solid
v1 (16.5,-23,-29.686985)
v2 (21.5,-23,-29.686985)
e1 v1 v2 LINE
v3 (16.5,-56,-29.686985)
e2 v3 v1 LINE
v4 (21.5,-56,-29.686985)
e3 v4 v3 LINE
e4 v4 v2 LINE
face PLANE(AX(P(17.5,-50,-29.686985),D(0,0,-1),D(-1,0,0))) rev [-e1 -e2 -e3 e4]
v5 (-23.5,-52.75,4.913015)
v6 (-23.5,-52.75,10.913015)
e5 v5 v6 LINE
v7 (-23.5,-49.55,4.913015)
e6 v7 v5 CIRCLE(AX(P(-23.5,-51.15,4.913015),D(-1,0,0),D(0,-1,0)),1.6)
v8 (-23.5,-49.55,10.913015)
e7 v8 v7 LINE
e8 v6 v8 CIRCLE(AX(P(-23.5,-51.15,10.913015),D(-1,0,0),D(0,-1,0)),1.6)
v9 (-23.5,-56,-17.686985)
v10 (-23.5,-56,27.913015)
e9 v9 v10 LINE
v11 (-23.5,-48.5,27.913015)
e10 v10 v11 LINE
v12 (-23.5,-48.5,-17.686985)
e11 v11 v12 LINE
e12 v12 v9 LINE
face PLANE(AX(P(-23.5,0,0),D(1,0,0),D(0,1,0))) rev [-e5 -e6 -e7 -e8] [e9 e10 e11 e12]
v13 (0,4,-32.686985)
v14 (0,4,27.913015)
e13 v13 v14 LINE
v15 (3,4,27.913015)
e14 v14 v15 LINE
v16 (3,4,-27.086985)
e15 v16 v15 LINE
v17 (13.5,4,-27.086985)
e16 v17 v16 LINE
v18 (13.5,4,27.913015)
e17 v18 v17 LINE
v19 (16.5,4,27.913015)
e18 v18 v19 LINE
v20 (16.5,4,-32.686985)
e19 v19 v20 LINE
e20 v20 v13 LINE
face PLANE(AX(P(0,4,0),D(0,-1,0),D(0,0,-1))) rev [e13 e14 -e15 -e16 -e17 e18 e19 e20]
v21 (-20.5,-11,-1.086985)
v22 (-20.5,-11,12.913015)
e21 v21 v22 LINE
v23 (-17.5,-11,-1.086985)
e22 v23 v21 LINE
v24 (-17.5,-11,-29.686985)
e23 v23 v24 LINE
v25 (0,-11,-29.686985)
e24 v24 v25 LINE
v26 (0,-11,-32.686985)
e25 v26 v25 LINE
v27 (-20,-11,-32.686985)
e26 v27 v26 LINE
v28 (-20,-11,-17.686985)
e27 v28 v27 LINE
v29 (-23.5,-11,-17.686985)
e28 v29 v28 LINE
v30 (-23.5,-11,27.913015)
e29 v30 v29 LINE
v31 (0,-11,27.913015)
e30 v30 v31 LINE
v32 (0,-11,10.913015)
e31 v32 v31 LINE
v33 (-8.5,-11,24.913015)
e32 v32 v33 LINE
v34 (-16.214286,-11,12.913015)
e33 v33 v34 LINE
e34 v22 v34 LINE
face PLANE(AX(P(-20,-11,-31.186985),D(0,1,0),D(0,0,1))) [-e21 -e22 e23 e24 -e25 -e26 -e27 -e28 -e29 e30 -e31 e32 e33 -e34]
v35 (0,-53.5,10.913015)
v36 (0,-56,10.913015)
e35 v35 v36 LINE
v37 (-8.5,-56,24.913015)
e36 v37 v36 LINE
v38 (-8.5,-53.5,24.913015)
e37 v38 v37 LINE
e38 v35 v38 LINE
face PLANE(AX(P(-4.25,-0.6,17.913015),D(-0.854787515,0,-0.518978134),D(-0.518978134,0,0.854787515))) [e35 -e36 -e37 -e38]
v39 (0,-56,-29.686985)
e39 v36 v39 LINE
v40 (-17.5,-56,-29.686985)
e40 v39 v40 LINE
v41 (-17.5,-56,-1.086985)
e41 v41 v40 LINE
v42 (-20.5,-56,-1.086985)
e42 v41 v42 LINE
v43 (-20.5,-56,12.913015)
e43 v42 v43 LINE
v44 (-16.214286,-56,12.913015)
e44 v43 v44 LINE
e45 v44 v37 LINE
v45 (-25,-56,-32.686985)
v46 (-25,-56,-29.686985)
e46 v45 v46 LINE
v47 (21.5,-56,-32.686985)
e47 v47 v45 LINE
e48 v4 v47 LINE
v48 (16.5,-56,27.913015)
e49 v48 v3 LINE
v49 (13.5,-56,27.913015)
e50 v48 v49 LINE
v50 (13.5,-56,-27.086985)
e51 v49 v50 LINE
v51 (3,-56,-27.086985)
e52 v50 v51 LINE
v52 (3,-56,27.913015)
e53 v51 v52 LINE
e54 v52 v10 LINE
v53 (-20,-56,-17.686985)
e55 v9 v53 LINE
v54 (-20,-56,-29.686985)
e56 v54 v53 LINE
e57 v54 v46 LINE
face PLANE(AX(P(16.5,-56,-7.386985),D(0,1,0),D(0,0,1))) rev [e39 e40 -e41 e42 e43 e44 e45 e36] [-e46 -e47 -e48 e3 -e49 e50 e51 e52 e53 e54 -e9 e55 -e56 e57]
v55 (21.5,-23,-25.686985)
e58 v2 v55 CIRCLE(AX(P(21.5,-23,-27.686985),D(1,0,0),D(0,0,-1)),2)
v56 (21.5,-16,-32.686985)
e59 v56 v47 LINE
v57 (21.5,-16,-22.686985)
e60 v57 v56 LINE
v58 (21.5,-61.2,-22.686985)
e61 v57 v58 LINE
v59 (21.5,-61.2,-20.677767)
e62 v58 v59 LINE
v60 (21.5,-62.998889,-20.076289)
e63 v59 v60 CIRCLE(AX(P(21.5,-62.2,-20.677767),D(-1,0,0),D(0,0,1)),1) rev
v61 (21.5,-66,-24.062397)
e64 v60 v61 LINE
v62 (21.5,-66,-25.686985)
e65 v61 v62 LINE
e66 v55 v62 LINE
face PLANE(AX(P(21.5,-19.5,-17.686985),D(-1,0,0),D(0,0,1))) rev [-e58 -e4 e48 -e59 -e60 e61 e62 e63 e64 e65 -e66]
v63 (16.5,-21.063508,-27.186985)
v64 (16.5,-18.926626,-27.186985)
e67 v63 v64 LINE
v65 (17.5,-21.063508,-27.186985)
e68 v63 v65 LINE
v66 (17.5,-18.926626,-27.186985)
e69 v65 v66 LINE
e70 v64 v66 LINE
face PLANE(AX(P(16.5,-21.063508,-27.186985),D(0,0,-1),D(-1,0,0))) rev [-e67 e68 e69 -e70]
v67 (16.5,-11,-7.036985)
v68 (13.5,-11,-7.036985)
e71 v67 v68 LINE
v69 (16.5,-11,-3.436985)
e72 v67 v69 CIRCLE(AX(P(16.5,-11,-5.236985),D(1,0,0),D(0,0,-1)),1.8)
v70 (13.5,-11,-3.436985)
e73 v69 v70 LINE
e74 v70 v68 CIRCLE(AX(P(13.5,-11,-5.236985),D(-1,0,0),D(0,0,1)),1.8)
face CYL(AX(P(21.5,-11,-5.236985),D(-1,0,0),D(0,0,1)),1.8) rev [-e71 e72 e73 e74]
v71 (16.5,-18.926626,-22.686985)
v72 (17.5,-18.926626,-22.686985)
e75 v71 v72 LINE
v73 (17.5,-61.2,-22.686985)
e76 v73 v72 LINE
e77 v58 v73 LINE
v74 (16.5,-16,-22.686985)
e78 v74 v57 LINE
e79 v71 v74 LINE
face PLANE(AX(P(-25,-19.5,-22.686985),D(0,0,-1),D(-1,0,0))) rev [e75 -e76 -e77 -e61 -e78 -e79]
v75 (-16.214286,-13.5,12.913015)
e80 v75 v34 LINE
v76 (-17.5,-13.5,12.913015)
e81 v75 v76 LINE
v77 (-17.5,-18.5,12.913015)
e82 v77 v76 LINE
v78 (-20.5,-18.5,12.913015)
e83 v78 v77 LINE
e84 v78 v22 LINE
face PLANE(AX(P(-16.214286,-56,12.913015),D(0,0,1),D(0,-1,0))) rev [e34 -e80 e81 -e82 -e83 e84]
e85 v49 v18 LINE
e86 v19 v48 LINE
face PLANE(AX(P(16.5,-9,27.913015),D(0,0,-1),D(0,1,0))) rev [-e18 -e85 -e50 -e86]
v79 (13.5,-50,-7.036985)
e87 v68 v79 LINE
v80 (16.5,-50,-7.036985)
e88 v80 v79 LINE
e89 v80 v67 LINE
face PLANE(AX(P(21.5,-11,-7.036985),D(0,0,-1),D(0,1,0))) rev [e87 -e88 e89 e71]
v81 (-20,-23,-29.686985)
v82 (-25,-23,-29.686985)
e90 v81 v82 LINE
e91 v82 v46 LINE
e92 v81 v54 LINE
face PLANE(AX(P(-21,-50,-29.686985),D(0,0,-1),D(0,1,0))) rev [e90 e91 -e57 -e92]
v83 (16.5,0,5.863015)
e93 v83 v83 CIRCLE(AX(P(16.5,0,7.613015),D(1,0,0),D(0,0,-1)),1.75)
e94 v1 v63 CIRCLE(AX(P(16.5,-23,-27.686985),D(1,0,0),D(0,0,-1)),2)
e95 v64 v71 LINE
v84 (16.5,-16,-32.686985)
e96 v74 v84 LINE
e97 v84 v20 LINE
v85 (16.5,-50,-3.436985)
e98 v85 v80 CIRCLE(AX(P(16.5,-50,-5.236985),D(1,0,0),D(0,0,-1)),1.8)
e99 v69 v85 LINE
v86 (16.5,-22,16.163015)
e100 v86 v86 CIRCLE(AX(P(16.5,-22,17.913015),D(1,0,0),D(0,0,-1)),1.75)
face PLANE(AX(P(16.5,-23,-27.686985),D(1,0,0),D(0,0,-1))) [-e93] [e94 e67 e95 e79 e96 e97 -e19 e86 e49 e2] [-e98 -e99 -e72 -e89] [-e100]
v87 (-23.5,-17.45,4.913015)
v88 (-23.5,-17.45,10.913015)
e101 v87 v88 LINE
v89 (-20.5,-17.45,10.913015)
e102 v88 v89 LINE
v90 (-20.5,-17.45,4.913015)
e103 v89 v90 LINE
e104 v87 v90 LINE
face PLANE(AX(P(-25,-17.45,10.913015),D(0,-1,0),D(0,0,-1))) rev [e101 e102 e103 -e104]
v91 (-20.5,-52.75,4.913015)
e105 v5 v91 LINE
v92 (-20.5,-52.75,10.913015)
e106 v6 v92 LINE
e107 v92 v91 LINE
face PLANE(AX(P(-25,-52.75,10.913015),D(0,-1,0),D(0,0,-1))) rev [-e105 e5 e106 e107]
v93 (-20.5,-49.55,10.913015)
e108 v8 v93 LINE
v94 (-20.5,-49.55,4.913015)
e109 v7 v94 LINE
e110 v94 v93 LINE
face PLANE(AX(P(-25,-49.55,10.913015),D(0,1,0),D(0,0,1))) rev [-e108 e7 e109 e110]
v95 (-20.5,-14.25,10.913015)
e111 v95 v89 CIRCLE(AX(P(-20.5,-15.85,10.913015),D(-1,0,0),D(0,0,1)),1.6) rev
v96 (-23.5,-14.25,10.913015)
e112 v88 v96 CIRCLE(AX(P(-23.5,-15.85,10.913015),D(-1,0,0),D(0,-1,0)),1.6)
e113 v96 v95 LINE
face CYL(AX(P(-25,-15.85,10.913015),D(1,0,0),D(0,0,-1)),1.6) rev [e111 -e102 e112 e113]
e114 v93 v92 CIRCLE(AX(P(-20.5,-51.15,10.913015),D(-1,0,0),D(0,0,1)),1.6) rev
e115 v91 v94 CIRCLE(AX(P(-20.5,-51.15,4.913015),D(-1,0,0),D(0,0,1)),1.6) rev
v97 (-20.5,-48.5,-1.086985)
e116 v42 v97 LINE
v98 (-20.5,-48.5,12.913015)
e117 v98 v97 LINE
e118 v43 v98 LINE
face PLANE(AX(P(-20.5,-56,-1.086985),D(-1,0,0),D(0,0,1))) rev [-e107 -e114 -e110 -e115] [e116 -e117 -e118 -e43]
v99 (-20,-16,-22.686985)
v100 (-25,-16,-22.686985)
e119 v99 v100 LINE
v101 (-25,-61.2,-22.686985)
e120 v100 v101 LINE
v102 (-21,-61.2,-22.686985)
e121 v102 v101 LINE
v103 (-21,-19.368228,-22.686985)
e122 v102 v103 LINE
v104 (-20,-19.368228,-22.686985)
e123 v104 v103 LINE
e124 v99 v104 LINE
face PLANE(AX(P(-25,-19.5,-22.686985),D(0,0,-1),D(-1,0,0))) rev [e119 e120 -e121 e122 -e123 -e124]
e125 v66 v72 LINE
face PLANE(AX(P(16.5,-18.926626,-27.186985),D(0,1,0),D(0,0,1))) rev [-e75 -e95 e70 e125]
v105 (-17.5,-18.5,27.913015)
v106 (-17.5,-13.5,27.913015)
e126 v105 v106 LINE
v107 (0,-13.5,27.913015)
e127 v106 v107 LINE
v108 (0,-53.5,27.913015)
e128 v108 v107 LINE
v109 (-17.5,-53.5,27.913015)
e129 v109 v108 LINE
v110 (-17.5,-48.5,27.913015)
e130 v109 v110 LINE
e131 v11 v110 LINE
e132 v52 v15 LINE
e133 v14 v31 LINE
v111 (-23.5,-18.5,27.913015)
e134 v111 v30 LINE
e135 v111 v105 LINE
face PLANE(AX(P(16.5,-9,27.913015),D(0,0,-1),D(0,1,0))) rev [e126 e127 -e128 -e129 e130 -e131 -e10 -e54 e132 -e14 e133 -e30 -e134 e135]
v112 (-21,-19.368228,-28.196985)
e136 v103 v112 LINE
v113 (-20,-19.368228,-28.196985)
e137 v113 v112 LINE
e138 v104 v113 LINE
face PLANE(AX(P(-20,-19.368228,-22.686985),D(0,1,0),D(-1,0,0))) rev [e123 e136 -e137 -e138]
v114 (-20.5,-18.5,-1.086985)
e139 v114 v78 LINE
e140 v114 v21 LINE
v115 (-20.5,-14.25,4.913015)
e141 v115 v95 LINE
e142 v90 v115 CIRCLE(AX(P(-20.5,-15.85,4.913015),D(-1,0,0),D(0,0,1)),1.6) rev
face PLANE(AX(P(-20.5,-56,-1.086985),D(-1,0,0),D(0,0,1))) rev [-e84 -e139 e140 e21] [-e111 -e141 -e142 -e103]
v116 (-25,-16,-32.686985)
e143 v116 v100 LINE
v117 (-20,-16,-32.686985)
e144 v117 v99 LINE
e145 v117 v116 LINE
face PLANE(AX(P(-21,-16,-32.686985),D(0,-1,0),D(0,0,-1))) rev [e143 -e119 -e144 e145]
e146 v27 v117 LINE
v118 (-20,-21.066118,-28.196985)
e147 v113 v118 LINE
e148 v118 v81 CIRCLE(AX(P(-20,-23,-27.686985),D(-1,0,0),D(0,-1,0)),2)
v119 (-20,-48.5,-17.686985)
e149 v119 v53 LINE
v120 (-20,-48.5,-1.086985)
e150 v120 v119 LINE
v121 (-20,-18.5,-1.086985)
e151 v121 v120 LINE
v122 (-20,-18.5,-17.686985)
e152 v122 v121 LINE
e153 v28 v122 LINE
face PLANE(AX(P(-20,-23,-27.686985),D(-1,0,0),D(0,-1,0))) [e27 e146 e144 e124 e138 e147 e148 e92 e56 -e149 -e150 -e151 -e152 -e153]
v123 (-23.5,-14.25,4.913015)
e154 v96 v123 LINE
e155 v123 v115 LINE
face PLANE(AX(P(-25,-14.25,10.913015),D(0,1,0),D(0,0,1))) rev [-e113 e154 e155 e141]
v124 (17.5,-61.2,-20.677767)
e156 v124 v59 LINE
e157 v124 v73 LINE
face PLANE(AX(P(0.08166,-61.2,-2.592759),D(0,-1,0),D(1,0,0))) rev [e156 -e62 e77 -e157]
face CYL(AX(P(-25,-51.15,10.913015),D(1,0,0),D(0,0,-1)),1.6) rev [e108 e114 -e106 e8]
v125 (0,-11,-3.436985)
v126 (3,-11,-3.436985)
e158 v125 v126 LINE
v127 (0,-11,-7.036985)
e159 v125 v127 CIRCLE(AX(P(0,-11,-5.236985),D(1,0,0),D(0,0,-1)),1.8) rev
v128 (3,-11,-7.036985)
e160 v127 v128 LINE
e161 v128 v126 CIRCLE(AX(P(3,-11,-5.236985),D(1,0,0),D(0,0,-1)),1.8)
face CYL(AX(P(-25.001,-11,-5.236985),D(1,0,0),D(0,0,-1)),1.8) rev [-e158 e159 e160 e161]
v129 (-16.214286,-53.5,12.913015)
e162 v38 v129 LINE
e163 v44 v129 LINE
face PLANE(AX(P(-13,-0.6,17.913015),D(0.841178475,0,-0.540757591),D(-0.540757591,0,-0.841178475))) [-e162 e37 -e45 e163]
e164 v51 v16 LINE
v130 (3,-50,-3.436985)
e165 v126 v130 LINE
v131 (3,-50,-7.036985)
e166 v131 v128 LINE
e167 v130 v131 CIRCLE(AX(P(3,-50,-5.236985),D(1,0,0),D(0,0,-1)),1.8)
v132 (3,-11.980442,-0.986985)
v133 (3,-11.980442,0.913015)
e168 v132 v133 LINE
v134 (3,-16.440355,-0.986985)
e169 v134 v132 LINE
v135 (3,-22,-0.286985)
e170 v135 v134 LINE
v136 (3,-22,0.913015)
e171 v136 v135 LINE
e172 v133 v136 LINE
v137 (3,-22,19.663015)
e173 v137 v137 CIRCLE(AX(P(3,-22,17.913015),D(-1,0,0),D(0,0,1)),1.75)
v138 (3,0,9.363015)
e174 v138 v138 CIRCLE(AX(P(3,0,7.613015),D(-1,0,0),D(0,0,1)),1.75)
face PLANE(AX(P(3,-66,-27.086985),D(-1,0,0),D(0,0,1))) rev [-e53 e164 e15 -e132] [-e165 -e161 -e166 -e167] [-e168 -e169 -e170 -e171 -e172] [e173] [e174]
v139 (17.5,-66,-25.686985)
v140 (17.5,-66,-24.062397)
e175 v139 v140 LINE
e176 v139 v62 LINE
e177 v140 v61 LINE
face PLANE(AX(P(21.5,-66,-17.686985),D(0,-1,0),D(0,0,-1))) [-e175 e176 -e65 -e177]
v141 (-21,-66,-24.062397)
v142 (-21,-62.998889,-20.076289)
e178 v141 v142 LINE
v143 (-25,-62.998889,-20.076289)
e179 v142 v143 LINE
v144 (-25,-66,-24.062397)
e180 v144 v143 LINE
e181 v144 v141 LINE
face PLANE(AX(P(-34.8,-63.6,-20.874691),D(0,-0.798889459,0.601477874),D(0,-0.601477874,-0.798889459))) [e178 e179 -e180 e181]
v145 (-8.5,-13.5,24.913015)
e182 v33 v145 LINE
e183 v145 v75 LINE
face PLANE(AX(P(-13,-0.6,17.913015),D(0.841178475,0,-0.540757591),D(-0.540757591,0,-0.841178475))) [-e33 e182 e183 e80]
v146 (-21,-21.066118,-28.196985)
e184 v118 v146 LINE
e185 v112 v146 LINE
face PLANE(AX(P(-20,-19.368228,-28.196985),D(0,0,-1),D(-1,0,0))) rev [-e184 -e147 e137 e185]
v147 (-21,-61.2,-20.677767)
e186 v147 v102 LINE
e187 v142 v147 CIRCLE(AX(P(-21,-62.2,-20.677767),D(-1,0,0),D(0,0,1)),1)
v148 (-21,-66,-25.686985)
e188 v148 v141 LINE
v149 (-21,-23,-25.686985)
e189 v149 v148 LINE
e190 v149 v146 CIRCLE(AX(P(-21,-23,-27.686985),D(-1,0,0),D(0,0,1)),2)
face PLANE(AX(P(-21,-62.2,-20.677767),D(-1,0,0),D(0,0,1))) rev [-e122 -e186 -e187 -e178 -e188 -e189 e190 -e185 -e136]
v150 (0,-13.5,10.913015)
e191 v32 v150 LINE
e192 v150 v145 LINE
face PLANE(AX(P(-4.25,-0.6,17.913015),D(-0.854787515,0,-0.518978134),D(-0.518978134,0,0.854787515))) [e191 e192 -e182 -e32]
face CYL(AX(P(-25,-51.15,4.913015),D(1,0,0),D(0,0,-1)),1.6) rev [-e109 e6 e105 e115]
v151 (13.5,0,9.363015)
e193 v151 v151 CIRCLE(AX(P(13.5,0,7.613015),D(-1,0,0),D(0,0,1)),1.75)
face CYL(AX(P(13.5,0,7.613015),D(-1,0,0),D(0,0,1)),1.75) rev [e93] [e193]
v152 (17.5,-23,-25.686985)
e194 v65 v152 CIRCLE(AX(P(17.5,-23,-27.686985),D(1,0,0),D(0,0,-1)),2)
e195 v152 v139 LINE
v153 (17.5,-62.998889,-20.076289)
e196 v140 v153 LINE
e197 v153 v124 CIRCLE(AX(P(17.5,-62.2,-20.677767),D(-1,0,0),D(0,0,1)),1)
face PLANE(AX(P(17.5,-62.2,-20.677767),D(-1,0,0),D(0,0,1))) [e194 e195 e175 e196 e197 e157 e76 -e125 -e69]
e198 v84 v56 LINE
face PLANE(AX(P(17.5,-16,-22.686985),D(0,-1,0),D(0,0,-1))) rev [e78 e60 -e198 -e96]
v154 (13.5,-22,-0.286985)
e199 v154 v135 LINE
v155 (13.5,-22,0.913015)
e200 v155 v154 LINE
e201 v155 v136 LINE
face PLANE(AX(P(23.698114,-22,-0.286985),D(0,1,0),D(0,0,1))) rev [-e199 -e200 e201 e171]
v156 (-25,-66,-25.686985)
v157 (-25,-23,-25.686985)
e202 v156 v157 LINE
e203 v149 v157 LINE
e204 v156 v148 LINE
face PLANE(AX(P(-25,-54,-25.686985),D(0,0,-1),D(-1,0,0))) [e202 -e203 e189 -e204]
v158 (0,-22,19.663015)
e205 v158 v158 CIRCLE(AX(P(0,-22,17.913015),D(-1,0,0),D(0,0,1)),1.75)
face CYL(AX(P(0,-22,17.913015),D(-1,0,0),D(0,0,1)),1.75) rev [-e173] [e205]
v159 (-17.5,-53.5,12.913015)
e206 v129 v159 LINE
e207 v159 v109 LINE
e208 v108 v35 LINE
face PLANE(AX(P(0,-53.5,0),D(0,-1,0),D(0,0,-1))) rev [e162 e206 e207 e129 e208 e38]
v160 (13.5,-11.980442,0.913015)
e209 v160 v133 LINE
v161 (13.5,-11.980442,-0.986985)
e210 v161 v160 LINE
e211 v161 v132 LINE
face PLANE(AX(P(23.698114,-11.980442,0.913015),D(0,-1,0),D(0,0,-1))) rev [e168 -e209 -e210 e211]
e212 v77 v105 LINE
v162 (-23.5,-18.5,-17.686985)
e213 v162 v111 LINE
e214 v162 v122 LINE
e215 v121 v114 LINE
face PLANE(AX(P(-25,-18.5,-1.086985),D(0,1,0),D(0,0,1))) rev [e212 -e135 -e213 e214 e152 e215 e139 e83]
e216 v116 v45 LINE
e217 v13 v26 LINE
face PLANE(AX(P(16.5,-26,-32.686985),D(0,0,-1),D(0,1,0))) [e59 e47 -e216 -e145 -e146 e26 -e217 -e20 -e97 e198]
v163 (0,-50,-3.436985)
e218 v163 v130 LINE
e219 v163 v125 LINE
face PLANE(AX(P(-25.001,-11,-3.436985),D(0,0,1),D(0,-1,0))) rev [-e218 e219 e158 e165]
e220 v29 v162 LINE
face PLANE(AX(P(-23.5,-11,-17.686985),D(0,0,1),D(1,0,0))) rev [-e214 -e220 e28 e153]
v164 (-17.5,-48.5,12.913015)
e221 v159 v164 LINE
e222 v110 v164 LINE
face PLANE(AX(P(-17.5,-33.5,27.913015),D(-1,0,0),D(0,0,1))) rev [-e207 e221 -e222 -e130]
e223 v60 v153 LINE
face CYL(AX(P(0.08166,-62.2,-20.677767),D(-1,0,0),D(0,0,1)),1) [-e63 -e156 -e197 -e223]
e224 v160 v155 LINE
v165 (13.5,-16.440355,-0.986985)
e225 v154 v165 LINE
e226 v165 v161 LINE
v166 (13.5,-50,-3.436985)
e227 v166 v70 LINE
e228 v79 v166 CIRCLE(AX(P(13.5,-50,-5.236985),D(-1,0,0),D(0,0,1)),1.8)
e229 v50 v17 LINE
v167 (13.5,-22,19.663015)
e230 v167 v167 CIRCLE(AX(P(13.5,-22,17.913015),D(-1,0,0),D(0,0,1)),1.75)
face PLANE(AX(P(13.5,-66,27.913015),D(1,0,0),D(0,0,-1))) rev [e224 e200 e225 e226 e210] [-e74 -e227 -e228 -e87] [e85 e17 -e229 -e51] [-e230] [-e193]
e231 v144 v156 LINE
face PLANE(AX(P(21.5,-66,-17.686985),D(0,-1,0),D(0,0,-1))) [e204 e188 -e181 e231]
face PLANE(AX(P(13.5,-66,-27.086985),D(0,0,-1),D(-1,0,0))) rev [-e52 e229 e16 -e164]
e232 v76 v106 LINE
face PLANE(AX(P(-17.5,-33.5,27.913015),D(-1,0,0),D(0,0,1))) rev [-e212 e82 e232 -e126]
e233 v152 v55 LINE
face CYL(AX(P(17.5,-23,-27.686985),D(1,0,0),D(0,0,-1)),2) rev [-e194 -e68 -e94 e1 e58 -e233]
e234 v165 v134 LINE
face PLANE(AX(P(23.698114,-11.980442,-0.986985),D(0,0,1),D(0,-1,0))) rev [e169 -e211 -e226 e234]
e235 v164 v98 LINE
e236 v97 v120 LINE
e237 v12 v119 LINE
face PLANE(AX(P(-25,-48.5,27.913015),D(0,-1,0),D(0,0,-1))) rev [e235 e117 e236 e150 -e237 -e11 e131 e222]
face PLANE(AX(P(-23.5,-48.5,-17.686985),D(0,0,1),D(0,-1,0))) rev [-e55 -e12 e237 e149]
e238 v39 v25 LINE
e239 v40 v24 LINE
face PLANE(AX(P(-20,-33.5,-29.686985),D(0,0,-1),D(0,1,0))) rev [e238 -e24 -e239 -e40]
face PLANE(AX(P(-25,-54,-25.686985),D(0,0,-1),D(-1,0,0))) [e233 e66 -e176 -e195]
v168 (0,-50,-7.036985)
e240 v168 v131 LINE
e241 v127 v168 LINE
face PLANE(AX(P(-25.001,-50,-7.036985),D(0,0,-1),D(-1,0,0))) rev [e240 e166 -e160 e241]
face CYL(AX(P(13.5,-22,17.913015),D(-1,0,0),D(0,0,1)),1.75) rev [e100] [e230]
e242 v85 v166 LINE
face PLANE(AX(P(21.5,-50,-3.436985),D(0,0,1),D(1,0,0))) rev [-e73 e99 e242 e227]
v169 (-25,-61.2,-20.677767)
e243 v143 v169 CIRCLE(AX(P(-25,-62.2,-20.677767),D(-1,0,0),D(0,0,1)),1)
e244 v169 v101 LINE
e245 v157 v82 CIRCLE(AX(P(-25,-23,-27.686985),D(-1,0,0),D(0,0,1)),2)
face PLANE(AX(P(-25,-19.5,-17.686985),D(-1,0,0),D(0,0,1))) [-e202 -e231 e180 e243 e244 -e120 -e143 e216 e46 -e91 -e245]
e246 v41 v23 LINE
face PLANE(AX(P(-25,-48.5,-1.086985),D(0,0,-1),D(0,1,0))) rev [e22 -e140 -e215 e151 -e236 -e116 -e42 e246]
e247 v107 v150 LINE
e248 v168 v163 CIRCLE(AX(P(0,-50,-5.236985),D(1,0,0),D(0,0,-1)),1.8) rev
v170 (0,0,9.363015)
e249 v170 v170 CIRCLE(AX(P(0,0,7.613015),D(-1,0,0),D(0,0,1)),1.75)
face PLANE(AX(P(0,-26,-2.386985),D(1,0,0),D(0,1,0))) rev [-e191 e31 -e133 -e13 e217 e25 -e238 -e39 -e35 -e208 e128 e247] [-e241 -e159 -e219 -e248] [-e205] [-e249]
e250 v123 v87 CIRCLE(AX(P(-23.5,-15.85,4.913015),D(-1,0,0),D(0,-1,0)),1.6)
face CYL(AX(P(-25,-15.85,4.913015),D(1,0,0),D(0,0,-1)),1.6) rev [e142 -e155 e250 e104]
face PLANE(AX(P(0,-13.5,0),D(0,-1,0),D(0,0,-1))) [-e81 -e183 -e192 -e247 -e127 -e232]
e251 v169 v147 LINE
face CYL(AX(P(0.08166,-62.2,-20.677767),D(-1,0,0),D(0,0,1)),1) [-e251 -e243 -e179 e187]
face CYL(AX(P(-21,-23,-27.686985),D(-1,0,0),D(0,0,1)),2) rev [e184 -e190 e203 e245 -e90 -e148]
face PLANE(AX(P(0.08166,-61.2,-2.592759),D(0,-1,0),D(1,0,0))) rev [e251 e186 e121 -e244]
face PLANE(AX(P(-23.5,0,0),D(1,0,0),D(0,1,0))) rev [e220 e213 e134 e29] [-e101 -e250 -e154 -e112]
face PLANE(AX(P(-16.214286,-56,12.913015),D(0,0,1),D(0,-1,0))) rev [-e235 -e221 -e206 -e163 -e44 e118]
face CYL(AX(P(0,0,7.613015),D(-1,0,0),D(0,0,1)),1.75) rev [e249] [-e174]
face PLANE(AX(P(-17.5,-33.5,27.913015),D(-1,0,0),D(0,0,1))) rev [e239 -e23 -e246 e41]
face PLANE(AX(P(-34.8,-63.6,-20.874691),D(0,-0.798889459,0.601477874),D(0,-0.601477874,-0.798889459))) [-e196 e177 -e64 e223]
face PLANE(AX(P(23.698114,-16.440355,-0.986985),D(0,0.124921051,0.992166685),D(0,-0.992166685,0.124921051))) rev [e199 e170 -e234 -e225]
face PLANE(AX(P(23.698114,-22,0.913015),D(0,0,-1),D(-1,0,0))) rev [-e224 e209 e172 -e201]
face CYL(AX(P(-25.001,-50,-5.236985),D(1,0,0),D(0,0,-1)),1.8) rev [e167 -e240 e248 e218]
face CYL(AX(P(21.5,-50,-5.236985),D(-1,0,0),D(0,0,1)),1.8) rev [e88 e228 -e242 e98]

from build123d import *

# Parameters (mm, degrees)
CUT_EXTRUDE1_START             = -55
CUT_EXTRUDE1_DEPTH             = 50.2
CUT_EXTRUDE1_2_DEPTH           = 39
CUT_EXTRUDE1_START_2           = -16
CUT_EXTRUDE1_3_OUTLINE_W       = 21.5
CUT_EXTRUDE1_3_OUTLINE_H       = 4
CUT_EXTRUDE1_3_OUTLINE_W_2     = 7.5
CUT_EXTRUDE1_3_DEPTH           = 6
CUT_EXTRUDE1_START_3           = -10
CUT_EXTRUDE1_4_OUTLINE_W       = 17.5
CUT_EXTRUDE1_4_OUTLINE_H       = 3
CUT_EXTRUDE1_4_DEPTH           = 6.998889459
CUT_EXTRUDE1_START_4           = -32.686984715
CUT_EXTRUDE1_5_DEPTH           = 2.5
CUT_EXTRUDE1_START_5           = -25
CUT_EXTRUDE1_6_DEPTH           = 46.5
CUT_EXTRUDE2_DEPTH             = 5.2
CUT_EXTRUDE3_DEPTH             = 40
CUT_EXTRUDE4_DEPTH             = 38.5
CUT_EXTRUDE5_DEPTH             = 4
CUT_EXTRUDE6_DEPTH             = 4
CUT_EXTRUDE7_DEPTH             = 4
CUT_EXTRUDE8_START             = -4
CUT_EXTRUDE8_DEPTH             = 4
CUT_EXTRUDE9_START             = -1
CUT_EXTRUDE9_DEPTH             = 1
CUT_EXTRUDE10_DEPTH            = 1
SKETCH11_W                     = 16.5
SKETCH11_H                     = 60.6
BOSS_EXTRUDE1_DEPTH            = 15
SKETCH12_W                     = 29
SKETCH12_H                     = 30
CUT_EXTRUDE11_DEPTH            = 84.339300358
SKETCH13_W                     = 10.5
SKETCH13_H                     = 55
CUT_EXTRUDE12_DEPTH            = 82.199993727
CUT_EXTRUDE15_DEPTH            = 84.106491828
CUT_EXTRUDE16_REACH            = 80.794
BOSS_EXTRUDE2_DEPTH            = 10.5
F_3_5_3_5_DIAMETER_HOLE1_D     = 3.5
F_3_5_3_5_DIAMETER_HOLE1_DEPTH = 3
F_3_5_3_5_DIAMETER_HOLE2_D     = 3.5
F_3_5_3_5_DIAMETER_HOLE2_DEPTH = 8
SKETCH24_W                     = 46.5
SKETCH24_H                     = 16
CUT_EXTRUDE17_DEPTH            = 3
SKETCH25_W                     = 3
SKETCH25_H                     = 6
BOSS_EXTRUDE4_DEPTH            = 46.5
SKETCH27_W                     = 45.6
SKETCH27_H                     = 7.5
BOSS_EXTRUDE5_DEPTH            = 3.5
CUT_EXTRUDE18_START            = -45
SKETCH28_W                     = 4.285714286
SKETCH28_H                     = 14
CUT_EXTRUDE18_DEPTH            = 45


with BuildPart() as part:
    # Cut-Extrude1: read off the stored shape, not the designer's step
    # Cut-Extrude1 outline → Cut-Extrude1 (new body)
    with BuildSketch(Plane.XZ.offset(66).offset(CUT_EXTRUDE1_START)):
        Polygon((0, 10.913015285), (0, -25.686984715), (21.5, -25.686984715), (21.5, 27.913015285), (-25, 27.913015285), (-25, -25.686984715), (-17.5, -25.686984715), (-17.5, 10.913015285), (-8.5, 24.913015285), align=None)
    extrude(amount=CUT_EXTRUDE1_DEPTH)

    # Cut-Extrude1 2 outline → Cut-Extrude1 2 (add)
    with BuildSketch(Plane.XZ.offset(66).offset(CUT_EXTRUDE1_START)):
        Polygon((21.5, -25.686984715), (0, -25.686984715), (0, -29.686984715), (-17.5, -29.686984715), (-17.5, -25.686984715), (-25, -25.686984715), (-25, -32.686984715), (21.5, -32.686984715), align=None)
    extrude(amount=CUT_EXTRUDE1_2_DEPTH)

    # Cut-Extrude1 3 outline → Cut-Extrude1 3 (add)
    with BuildSketch(Plane.XZ.offset(66).offset(CUT_EXTRUDE1_START_2)):
        with Locations((10.75, -27.686984715)):
            Rectangle(CUT_EXTRUDE1_3_OUTLINE_W, CUT_EXTRUDE1_3_OUTLINE_H)
        with Locations((-21.25, -27.686984715)):
            Rectangle(CUT_EXTRUDE1_3_OUTLINE_W_2, CUT_EXTRUDE1_3_OUTLINE_H)
    extrude(amount=CUT_EXTRUDE1_3_DEPTH)

    # Cut-Extrude1 4 outline → Cut-Extrude1 4 (add)
    with BuildSketch(Plane.XZ.offset(66).offset(CUT_EXTRUDE1_START_3)):
        with Locations((-8.75, -24.186984715)):
            Rectangle(CUT_EXTRUDE1_4_OUTLINE_W, CUT_EXTRUDE1_4_OUTLINE_H)
    extrude(amount=CUT_EXTRUDE1_4_DEPTH)

    # Cut-Extrude1 5 outline → Cut-Extrude1 5 (add)
    with BuildSketch(Plane.XY.offset(CUT_EXTRUDE1_START_4)):
        with BuildLine():
            Line((21.5, -50), (20, -50))
            add(Edge.make_bspline(
                [(20, -50), (20, -56.474665919), (-1.75, -56.474665919), (-23.5, -56.474665919), (-23.5, -50)],
                knots=[3.141592654, 3.141592654, 3.141592654, 4.71238898, 4.71238898, 6.283185307, 6.283185307, 6.283185307], degree=2, weights=[1, 0.707106781, 1, 0.707106781, 1]))
            Line((-23.5, -50), (-25, -50))
            add(Edge.make_bspline(
                [(21.5, -50), (21.5, -50.09468229), (21.492127929, -50.284046871), (21.445455232, -50.658803427), (21.331279759, -51.114385581), (21.116585857, -51.62790352), (20.837225059, -52.104092778), (20.503510106, -52.544605667), (19.994946462, -53.090128019), (19.250040532, -53.706208194), (18.455849001, -54.204954404), (17.874413136, -54.519485832), (17.472964493, -54.724490985), (16.947888344, -54.97109157), (16.28060453, -55.252861877), (15.342350204, -55.610435464), (14.08020873, -56.024524848), (12.704647903, -56.395626222), (11.540151261, -56.666305963), (10.635775953, -56.85602278), (9.857415835, -57.002816928), (9.220023976, -57.113406891), (8.575249929, -57.219018373), (7.756242667, -57.341650868), (6.420129281, -57.517794074), (4.706083352, -57.700164474), (2.944949539, -57.831502083), (1.514762167, -57.90548411), (0.433251397, -57.945296373), (-0.473981522, -57.965298566), (-1.2023611, -57.973324155), (-1.75, -57.975336801), (-2.2976389, -57.973324155), (-3.026018478, -57.965298566), (-3.933251397, -57.945296373), (-5.014762167, -57.90548411), (-6.444949539, -57.831502083), (-8.206083352, -57.700164474), (-9.920129281, -57.517794074), (-11.256242667, -57.341650868), (-12.075249929, -57.219018373), (-12.720023976, -57.113406891), (-13.357415835, -57.002816928), (-14.135775953, -56.85602278), (-15.040151261, -56.666305963), (-16.204647903, -56.395626222), (-17.58020873, -56.024524848), (-18.842350204, -55.610435464), (-19.78060453, -55.252861877), (-20.447888344, -54.97109157), (-20.972964493, -54.724490985), (-21.374413136, -54.519485832), (-21.955849001, -54.204954404), (-22.750040532, -53.706208194), (-23.494946462, -53.090128019), (-24.003510106, -52.544605667), (-24.337225059, -52.104092778), (-24.616585857, -51.62790352), (-24.831279759, -51.114385581), (-24.945455232, -50.658803427), (-24.992127929, -50.284046871), (-25, -50.09468229), (-25, -50)],
                knots=[0.5, 0.5, 0.5, 0.5, 0.50390625, 0.5078125, 0.515625, 0.5234375, 0.53125, 0.5390625, 0.546875, 0.5625, 0.578125, 0.58203125, 0.5859375, 0.59375, 0.6015625, 0.609375, 0.625, 0.640625, 0.6484375, 0.65625, 0.6640625, 0.66796875, 0.671875, 0.6796875, 0.6875, 0.703125, 0.71875, 0.7265625, 0.734375, 0.7421875, 0.74609375, 0.75, 0.75390625, 0.7578125, 0.765625, 0.7734375, 0.78125, 0.796875, 0.8125, 0.8203125, 0.828125, 0.83203125, 0.8359375, 0.84375, 0.8515625, 0.859375, 0.875, 0.890625, 0.8984375, 0.90625, 0.9140625, 0.91796875, 0.921875, 0.9375, 0.953125, 0.9609375, 0.96875, 0.9765625, 0.984375, 0.9921875, 0.99609375, 1, 1, 1, 1], degree=3))
        make_face()
    extrude(amount=CUT_EXTRUDE1_5_DEPTH)

    # Cut-Extrude1 6 outline → Cut-Extrude1 6 (add)
    with BuildSketch(Plane.YZ.offset(CUT_EXTRUDE1_START_5)):
        with BuildLine():
            ThreePointArc((-61.2, -20.677767147), (-61.882895489, -19.729376547), (-62.998889459, -20.076289273))
            Line((-62.998889459, -20.076289273), (-66, -24.062396958))
            Line((-66, -24.062396958), (-66, -25.686984715))
            Line((-66, -25.686984715), (-61.2, -25.686984715))
            Line((-61.2, -25.686984715), (-61.2, -20.677767147))
        make_face()
    extrude(amount=CUT_EXTRUDE1_6_DEPTH)

    # Sketch2 → Cut-Extrude2 (cut)
    with BuildSketch(Plane.XZ.offset(61.2)):
        Polygon((-25, -22.686984715), (-17.5, -22.686984715), (-17.5, 10.913015285), (-8.5, 24.913015285), (0, 10.913015285), (0, -22.686984715), (21.5, -22.686984715), (21.5, 27.913015285), (-25, 27.913015285), align=None)
    extrude(amount=-CUT_EXTRUDE2_DEPTH, mode=Mode.SUBTRACT)

    # Sketch3 → Cut-Extrude3 (cut)
    with BuildSketch(Plane(origin=(0, -13.5, 0), x_dir=(1, 0, 0), z_dir=(0, 1, 0))):
        Polygon((-8.5, -24.913015285), (-17.5, -10.913015285), (-17.5, -27.913015285), (0, -27.913015285), (0, -10.913015285), align=None)
    extrude(amount=-CUT_EXTRUDE3_DEPTH, mode=Mode.SUBTRACT)

    # Sketch4 → Cut-Extrude4 (cut)
    with BuildSketch(Plane(origin=(-21, 0, 0), x_dir=(0, -1, 0), z_dir=(-1, 0, 0))):
        with BuildLine():
            Line((56, -22.686984715), (56, -25.686984715))
            Line((56, -25.686984715), (66, -25.686984715))
            Line((66, -25.686984715), (66, -24.062396958))
            Line((66, -24.062396958), (62.998889459, -20.076289273))
            ThreePointArc((62.998889459, -20.076289273), (61.882895489, -19.729376547), (61.2, -20.677767147))
            Line((61.2, -20.677767147), (61.2, -22.686984715))
            Line((61.2, -22.686984715), (56, -22.686984715))
        make_face()
    extrude(amount=-CUT_EXTRUDE4_DEPTH, mode=Mode.SUBTRACT)

    # Sketch5 → Cut-Extrude5 (cut)
    with BuildSketch(Plane.ZY.offset(25)):
        Polygon((-22.686984715, -16), (-22.686984715, -56), (27.913015285, -56), (27.913015285, -11), (-32.686984715, -11), (-32.686984715, -16), align=None)
    extrude(amount=-CUT_EXTRUDE5_DEPTH, mode=Mode.SUBTRACT)

    # Sketch6 → Cut-Extrude6 (cut)
    with BuildSketch(Plane.ZY.offset(25)):
        with BuildLine():
            Line((-29.686984715, -23), (-29.686984715, -50))
            Line((-29.686984715, -50), (-29.686984715, -56))
            Line((-29.686984715, -56), (-25.686984715, -56))
            Line((-25.686984715, -56), (-25.686984715, -23))
            ThreePointArc((-25.686984715, -23), (-27.686984715, -21), (-29.686984715, -23))
        make_face()
    extrude(amount=-CUT_EXTRUDE6_DEPTH, mode=Mode.SUBTRACT)

    # Sketch7 → Cut-Extrude7 (cut)
    with BuildSketch(Plane(origin=(21.5, 0, 0), x_dir=(0, 0, -1), z_dir=(1, 0, 0))):
        Polygon((-27.913015285, -56), (22.686984715, -56), (22.686984715, -16), (32.686984715, -16), (32.686984715, -11), (-27.913015285, -11), align=None)
    extrude(amount=-CUT_EXTRUDE7_DEPTH, mode=Mode.SUBTRACT)

    # Sketch8 → Cut-Extrude8 (cut)
    with BuildSketch(Plane(origin=(21.5, 0, 0), x_dir=(0, 0, -1), z_dir=(1, 0, 0)).offset(CUT_EXTRUDE8_START)):
        with BuildLine():
            Line((25.686984715, -23), (25.686984715, -56))
            Line((25.686984715, -56), (29.686984715, -56))
            Line((29.686984715, -56), (29.686984715, -50))
            Line((29.686984715, -50), (29.686984715, -23))
            ThreePointArc((29.686984715, -23), (27.686984715, -21), (25.686984715, -23))
        make_face()
    extrude(amount=CUT_EXTRUDE8_DEPTH, mode=Mode.SUBTRACT)

    # Sketch9 → Cut-Extrude9 (cut)
    with BuildSketch(Plane(origin=(17.5, 0, 0), x_dir=(0, 0, -1), z_dir=(1, 0, 0)).offset(CUT_EXTRUDE9_START)):
        with BuildLine():
            Line((32.686984715, -16), (32.686984715, -11))
            Line((32.686984715, -11), (-27.913015285, -11))
            Line((-27.913015285, -11), (-27.913015285, -56))
            Line((-27.913015285, -56), (29.686984715, -56))
            Line((29.686984715, -56), (29.686984715, -50))
            Line((29.686984715, -50), (29.686984715, -23))
            ThreePointArc((29.686984715, -23), (28.911729586, -21.41886117), (27.186984715, -21.063508327))
            Line((27.186984715, -21.063508327), (27.186984715, -18.926625782))
            Line((27.186984715, -18.926625782), (22.686984715, -18.926625782))
            Line((22.686984715, -18.926625782), (22.686984715, -16))
            Line((22.686984715, -16), (32.686984715, -16))
        make_face()
    extrude(amount=CUT_EXTRUDE9_DEPTH, mode=Mode.SUBTRACT)

    # Sketch10 → Cut-Extrude10 (cut)
    with BuildSketch(Plane.ZY.offset(21)):
        with BuildLine():
            Line((27.913015285, -56), (27.913015285, -11))
            Line((27.913015285, -11), (-32.686984715, -11))
            Line((-32.686984715, -11), (-32.686984715, -16))
            Line((-32.686984715, -16), (-22.686984715, -16))
            Line((-22.686984715, -16), (-22.686984715, -19.368227571))
            Line((-22.686984715, -19.368227571), (-28.196984715, -19.368227571))
            Line((-28.196984715, -19.368227571), (-28.196984715, -21.066117894))
            ThreePointArc((-28.196984715, -21.066117894), (-29.271282666, -21.779344438), (-29.686984715, -23))
            Line((-29.686984715, -23), (-29.686984715, -50))
            Line((-29.686984715, -50), (-29.686984715, -56))
            Line((-29.686984715, -56), (27.913015285, -56))
        make_face()
    extrude(amount=-CUT_EXTRUDE10_DEPTH, mode=Mode.SUBTRACT)

    # Sketch11 → Boss-Extrude1 (add)
    with BuildSketch(Plane(origin=(0, -11, 0), x_dir=(-1, 0, 0), z_dir=(0, 1, 0))):
        with Locations((-8.25, -2.386984715)):
            Rectangle(SKETCH11_W, SKETCH11_H)
    extrude(amount=BOSS_EXTRUDE1_DEPTH)

    # Sketch12 → Cut-Extrude11 (cut, through all)
    with BuildSketch(Plane(origin=(-17.5, 0, 0), x_dir=(0, 0, -1), z_dir=(1, 0, 0))):
        with Locations((-13.413015285, -33.5)):
            Rectangle(SKETCH12_W, SKETCH12_H)
        with BuildLine():
            Line((-10.913015285, -14.25), (-4.913015285, -14.25))
            ThreePointArc((-4.913015285, -14.25), (-3.313015285, -15.85), (-4.913015285, -17.45))
            Line((-4.913015285, -17.45), (-10.913015285, -17.45))
            ThreePointArc((-10.913015285, -17.45), (-12.513015285, -15.85), (-10.913015285, -14.25))
        make_face()
        with BuildLine():
            Line((-10.913015285, -49.55), (-4.913015285, -49.55))
            ThreePointArc((-4.913015285, -49.55), (-3.313015285, -51.15), (-4.913015285, -52.75))
            Line((-4.913015285, -52.75), (-10.913015285, -52.75))
            ThreePointArc((-10.913015285, -52.75), (-12.513015285, -51.15), (-10.913015285, -49.55))
        make_face()
    extrude(amount=-CUT_EXTRUDE11_DEPTH, mode=Mode.SUBTRACT)

    # Sketch13 → Cut-Extrude12 (cut, through all)
    with BuildSketch(Plane(origin=(0, 4, 0), x_dir=(-1, 0, 0), z_dir=(0, 1, 0))):
        with Locations((-8.25, 0.413015285)):
            Rectangle(SKETCH13_W, SKETCH13_H)
    extrude(amount=-CUT_EXTRUDE12_DEPTH, mode=Mode.SUBTRACT)

    # Sketch16 → Cut-Extrude15 (cut, through all)
    with BuildSketch(Plane.ZY.offset(-13.5)):
        with BuildLine():
            Line((-3.436984715, -50), (-3.436984715, -11))
            ThreePointArc((-3.436984715, -11), (-5.236984715, -9.2), (-7.036984715, -11))
            Line((-7.036984715, -11), (-7.036984715, -50))
            ThreePointArc((-7.036984715, -50), (-5.236984715, -51.8), (-3.436984715, -50))
        make_face()
    extrude(amount=-CUT_EXTRUDE15_DEPTH, mode=Mode.SUBTRACT)

    # Sketch17 → Cut-Extrude16 (cut, up to next)
    with BuildSketch(Plane(origin=(3, 0, 0), x_dir=(0, 0, -1), z_dir=(1, 0, 0)), mode=Mode.PRIVATE) as cut_extrude16_sk1:
        with BuildLine():
            Line((7.036984715, -50), (7.036984715, -11))
            ThreePointArc((7.036984715, -11), (5.236984715, -9.2), (3.436984715, -11))
            Line((3.436984715, -11), (3.436984715, -50))
            ThreePointArc((3.436984715, -50), (5.236984715, -51.8), (7.036984715, -50))
        make_face()
    cut_extrude16_tool1 = extrude(cut_extrude16_sk1.sketch, amount=-CUT_EXTRUDE16_REACH, mode=Mode.PRIVATE) & part.part
    add(cut_extrude16_tool1.solids().sort_by_distance((3, -30.5, -5.236985))[0], mode=Mode.SUBTRACT)

    # Sketch18 → Boss-Extrude2 (add)
    with BuildSketch(Plane(origin=(3, 0, 0), x_dir=(0, 0, -1), z_dir=(1, 0, 0))):
        Polygon((-0.913015285, -22), (-0.913015285, -11.980442449), (0.986984715, -11.980442449), (0.986984715, -16.440355157), (0.286984715, -22), align=None)
    extrude(amount=BOSS_EXTRUDE2_DEPTH)

    # Ø3.5 (3.5) Diameter Hole1
    with Locations(Plane.ZY):
        with Locations((7.613015285, 0), (17.913015285, -22)):
            Hole(F_3_5_3_5_DIAMETER_HOLE1_D / 2, depth=F_3_5_3_5_DIAMETER_HOLE1_DEPTH)

    # Ø3.5 (3.5) Diameter Hole2
    with Locations(Plane.ZY.offset(-13.5)):
        with Locations((7.613015285, 0), (17.913015285, -22)):
            Hole(F_3_5_3_5_DIAMETER_HOLE2_D / 2, depth=F_3_5_3_5_DIAMETER_HOLE2_DEPTH)

    # Sketch24 → Cut-Extrude17 (cut)
    with BuildSketch(Plane(origin=(0, 0, -32.686984715), x_dir=(-1, 0, 0), z_dir=(0, 0, -1))):
        with Locations((1.75, -58)):
            Rectangle(SKETCH24_W, SKETCH24_H)
    extrude(amount=-CUT_EXTRUDE17_DEPTH, mode=Mode.SUBTRACT)

    # Sketch25 → Boss-Extrude4 (add)
    with BuildSketch(Plane.ZY.offset(25)):
        with Locations((-31.186984715, -53)):
            Rectangle(SKETCH25_W, SKETCH25_H)
    extrude(amount=-BOSS_EXTRUDE4_DEPTH)

    # Sketch27 → Boss-Extrude5 (add)
    # profile 1 of 2: a face of its own
    with BuildSketch(Plane.ZY.offset(20)):
        with Locations((5.113015285, -14.75)):
            Rectangle(SKETCH27_W, SKETCH27_H)
        with BuildLine():
            Line((10.913015285, -17.45), (4.913015285, -17.45))
            ThreePointArc((4.913015285, -17.45), (3.313015285, -15.85), (4.913015285, -14.25))
            Line((4.913015285, -14.25), (10.913015285, -14.25))
            ThreePointArc((10.913015285, -14.25), (12.513015285, -15.85), (10.913015285, -17.45))
        make_face(mode=Mode.SUBTRACT)
    # profile 2 of 2: a face of its own
    with BuildSketch(Plane.ZY.offset(20)):
        with Locations((5.113015285, -52.25)):
            Rectangle(SKETCH27_W, SKETCH27_H)
        with BuildLine():
            Line((10.913015285, -52.75), (4.913015285, -52.75))
            ThreePointArc((4.913015285, -52.75), (3.313015285, -51.15), (4.913015285, -49.55))
            Line((4.913015285, -49.55), (10.913015285, -49.55))
            ThreePointArc((10.913015285, -49.55), (12.513015285, -51.15), (10.913015285, -52.75))
        make_face(mode=Mode.SUBTRACT)
    extrude(amount=BOSS_EXTRUDE5_DEPTH)

    # Sketch28 → Cut-Extrude18 (cut)
    with BuildSketch(Plane(origin=(0, -11, 0), x_dir=(1, 0, 0), z_dir=(0, 1, 0)).offset(CUT_EXTRUDE18_START)):
        with Locations((-18.357142857, -5.913015285)):
            Rectangle(SKETCH28_W, SKETCH28_H)
    extrude(amount=CUT_EXTRUDE18_DEPTH, mode=Mode.SUBTRACT)


solid = part.part
